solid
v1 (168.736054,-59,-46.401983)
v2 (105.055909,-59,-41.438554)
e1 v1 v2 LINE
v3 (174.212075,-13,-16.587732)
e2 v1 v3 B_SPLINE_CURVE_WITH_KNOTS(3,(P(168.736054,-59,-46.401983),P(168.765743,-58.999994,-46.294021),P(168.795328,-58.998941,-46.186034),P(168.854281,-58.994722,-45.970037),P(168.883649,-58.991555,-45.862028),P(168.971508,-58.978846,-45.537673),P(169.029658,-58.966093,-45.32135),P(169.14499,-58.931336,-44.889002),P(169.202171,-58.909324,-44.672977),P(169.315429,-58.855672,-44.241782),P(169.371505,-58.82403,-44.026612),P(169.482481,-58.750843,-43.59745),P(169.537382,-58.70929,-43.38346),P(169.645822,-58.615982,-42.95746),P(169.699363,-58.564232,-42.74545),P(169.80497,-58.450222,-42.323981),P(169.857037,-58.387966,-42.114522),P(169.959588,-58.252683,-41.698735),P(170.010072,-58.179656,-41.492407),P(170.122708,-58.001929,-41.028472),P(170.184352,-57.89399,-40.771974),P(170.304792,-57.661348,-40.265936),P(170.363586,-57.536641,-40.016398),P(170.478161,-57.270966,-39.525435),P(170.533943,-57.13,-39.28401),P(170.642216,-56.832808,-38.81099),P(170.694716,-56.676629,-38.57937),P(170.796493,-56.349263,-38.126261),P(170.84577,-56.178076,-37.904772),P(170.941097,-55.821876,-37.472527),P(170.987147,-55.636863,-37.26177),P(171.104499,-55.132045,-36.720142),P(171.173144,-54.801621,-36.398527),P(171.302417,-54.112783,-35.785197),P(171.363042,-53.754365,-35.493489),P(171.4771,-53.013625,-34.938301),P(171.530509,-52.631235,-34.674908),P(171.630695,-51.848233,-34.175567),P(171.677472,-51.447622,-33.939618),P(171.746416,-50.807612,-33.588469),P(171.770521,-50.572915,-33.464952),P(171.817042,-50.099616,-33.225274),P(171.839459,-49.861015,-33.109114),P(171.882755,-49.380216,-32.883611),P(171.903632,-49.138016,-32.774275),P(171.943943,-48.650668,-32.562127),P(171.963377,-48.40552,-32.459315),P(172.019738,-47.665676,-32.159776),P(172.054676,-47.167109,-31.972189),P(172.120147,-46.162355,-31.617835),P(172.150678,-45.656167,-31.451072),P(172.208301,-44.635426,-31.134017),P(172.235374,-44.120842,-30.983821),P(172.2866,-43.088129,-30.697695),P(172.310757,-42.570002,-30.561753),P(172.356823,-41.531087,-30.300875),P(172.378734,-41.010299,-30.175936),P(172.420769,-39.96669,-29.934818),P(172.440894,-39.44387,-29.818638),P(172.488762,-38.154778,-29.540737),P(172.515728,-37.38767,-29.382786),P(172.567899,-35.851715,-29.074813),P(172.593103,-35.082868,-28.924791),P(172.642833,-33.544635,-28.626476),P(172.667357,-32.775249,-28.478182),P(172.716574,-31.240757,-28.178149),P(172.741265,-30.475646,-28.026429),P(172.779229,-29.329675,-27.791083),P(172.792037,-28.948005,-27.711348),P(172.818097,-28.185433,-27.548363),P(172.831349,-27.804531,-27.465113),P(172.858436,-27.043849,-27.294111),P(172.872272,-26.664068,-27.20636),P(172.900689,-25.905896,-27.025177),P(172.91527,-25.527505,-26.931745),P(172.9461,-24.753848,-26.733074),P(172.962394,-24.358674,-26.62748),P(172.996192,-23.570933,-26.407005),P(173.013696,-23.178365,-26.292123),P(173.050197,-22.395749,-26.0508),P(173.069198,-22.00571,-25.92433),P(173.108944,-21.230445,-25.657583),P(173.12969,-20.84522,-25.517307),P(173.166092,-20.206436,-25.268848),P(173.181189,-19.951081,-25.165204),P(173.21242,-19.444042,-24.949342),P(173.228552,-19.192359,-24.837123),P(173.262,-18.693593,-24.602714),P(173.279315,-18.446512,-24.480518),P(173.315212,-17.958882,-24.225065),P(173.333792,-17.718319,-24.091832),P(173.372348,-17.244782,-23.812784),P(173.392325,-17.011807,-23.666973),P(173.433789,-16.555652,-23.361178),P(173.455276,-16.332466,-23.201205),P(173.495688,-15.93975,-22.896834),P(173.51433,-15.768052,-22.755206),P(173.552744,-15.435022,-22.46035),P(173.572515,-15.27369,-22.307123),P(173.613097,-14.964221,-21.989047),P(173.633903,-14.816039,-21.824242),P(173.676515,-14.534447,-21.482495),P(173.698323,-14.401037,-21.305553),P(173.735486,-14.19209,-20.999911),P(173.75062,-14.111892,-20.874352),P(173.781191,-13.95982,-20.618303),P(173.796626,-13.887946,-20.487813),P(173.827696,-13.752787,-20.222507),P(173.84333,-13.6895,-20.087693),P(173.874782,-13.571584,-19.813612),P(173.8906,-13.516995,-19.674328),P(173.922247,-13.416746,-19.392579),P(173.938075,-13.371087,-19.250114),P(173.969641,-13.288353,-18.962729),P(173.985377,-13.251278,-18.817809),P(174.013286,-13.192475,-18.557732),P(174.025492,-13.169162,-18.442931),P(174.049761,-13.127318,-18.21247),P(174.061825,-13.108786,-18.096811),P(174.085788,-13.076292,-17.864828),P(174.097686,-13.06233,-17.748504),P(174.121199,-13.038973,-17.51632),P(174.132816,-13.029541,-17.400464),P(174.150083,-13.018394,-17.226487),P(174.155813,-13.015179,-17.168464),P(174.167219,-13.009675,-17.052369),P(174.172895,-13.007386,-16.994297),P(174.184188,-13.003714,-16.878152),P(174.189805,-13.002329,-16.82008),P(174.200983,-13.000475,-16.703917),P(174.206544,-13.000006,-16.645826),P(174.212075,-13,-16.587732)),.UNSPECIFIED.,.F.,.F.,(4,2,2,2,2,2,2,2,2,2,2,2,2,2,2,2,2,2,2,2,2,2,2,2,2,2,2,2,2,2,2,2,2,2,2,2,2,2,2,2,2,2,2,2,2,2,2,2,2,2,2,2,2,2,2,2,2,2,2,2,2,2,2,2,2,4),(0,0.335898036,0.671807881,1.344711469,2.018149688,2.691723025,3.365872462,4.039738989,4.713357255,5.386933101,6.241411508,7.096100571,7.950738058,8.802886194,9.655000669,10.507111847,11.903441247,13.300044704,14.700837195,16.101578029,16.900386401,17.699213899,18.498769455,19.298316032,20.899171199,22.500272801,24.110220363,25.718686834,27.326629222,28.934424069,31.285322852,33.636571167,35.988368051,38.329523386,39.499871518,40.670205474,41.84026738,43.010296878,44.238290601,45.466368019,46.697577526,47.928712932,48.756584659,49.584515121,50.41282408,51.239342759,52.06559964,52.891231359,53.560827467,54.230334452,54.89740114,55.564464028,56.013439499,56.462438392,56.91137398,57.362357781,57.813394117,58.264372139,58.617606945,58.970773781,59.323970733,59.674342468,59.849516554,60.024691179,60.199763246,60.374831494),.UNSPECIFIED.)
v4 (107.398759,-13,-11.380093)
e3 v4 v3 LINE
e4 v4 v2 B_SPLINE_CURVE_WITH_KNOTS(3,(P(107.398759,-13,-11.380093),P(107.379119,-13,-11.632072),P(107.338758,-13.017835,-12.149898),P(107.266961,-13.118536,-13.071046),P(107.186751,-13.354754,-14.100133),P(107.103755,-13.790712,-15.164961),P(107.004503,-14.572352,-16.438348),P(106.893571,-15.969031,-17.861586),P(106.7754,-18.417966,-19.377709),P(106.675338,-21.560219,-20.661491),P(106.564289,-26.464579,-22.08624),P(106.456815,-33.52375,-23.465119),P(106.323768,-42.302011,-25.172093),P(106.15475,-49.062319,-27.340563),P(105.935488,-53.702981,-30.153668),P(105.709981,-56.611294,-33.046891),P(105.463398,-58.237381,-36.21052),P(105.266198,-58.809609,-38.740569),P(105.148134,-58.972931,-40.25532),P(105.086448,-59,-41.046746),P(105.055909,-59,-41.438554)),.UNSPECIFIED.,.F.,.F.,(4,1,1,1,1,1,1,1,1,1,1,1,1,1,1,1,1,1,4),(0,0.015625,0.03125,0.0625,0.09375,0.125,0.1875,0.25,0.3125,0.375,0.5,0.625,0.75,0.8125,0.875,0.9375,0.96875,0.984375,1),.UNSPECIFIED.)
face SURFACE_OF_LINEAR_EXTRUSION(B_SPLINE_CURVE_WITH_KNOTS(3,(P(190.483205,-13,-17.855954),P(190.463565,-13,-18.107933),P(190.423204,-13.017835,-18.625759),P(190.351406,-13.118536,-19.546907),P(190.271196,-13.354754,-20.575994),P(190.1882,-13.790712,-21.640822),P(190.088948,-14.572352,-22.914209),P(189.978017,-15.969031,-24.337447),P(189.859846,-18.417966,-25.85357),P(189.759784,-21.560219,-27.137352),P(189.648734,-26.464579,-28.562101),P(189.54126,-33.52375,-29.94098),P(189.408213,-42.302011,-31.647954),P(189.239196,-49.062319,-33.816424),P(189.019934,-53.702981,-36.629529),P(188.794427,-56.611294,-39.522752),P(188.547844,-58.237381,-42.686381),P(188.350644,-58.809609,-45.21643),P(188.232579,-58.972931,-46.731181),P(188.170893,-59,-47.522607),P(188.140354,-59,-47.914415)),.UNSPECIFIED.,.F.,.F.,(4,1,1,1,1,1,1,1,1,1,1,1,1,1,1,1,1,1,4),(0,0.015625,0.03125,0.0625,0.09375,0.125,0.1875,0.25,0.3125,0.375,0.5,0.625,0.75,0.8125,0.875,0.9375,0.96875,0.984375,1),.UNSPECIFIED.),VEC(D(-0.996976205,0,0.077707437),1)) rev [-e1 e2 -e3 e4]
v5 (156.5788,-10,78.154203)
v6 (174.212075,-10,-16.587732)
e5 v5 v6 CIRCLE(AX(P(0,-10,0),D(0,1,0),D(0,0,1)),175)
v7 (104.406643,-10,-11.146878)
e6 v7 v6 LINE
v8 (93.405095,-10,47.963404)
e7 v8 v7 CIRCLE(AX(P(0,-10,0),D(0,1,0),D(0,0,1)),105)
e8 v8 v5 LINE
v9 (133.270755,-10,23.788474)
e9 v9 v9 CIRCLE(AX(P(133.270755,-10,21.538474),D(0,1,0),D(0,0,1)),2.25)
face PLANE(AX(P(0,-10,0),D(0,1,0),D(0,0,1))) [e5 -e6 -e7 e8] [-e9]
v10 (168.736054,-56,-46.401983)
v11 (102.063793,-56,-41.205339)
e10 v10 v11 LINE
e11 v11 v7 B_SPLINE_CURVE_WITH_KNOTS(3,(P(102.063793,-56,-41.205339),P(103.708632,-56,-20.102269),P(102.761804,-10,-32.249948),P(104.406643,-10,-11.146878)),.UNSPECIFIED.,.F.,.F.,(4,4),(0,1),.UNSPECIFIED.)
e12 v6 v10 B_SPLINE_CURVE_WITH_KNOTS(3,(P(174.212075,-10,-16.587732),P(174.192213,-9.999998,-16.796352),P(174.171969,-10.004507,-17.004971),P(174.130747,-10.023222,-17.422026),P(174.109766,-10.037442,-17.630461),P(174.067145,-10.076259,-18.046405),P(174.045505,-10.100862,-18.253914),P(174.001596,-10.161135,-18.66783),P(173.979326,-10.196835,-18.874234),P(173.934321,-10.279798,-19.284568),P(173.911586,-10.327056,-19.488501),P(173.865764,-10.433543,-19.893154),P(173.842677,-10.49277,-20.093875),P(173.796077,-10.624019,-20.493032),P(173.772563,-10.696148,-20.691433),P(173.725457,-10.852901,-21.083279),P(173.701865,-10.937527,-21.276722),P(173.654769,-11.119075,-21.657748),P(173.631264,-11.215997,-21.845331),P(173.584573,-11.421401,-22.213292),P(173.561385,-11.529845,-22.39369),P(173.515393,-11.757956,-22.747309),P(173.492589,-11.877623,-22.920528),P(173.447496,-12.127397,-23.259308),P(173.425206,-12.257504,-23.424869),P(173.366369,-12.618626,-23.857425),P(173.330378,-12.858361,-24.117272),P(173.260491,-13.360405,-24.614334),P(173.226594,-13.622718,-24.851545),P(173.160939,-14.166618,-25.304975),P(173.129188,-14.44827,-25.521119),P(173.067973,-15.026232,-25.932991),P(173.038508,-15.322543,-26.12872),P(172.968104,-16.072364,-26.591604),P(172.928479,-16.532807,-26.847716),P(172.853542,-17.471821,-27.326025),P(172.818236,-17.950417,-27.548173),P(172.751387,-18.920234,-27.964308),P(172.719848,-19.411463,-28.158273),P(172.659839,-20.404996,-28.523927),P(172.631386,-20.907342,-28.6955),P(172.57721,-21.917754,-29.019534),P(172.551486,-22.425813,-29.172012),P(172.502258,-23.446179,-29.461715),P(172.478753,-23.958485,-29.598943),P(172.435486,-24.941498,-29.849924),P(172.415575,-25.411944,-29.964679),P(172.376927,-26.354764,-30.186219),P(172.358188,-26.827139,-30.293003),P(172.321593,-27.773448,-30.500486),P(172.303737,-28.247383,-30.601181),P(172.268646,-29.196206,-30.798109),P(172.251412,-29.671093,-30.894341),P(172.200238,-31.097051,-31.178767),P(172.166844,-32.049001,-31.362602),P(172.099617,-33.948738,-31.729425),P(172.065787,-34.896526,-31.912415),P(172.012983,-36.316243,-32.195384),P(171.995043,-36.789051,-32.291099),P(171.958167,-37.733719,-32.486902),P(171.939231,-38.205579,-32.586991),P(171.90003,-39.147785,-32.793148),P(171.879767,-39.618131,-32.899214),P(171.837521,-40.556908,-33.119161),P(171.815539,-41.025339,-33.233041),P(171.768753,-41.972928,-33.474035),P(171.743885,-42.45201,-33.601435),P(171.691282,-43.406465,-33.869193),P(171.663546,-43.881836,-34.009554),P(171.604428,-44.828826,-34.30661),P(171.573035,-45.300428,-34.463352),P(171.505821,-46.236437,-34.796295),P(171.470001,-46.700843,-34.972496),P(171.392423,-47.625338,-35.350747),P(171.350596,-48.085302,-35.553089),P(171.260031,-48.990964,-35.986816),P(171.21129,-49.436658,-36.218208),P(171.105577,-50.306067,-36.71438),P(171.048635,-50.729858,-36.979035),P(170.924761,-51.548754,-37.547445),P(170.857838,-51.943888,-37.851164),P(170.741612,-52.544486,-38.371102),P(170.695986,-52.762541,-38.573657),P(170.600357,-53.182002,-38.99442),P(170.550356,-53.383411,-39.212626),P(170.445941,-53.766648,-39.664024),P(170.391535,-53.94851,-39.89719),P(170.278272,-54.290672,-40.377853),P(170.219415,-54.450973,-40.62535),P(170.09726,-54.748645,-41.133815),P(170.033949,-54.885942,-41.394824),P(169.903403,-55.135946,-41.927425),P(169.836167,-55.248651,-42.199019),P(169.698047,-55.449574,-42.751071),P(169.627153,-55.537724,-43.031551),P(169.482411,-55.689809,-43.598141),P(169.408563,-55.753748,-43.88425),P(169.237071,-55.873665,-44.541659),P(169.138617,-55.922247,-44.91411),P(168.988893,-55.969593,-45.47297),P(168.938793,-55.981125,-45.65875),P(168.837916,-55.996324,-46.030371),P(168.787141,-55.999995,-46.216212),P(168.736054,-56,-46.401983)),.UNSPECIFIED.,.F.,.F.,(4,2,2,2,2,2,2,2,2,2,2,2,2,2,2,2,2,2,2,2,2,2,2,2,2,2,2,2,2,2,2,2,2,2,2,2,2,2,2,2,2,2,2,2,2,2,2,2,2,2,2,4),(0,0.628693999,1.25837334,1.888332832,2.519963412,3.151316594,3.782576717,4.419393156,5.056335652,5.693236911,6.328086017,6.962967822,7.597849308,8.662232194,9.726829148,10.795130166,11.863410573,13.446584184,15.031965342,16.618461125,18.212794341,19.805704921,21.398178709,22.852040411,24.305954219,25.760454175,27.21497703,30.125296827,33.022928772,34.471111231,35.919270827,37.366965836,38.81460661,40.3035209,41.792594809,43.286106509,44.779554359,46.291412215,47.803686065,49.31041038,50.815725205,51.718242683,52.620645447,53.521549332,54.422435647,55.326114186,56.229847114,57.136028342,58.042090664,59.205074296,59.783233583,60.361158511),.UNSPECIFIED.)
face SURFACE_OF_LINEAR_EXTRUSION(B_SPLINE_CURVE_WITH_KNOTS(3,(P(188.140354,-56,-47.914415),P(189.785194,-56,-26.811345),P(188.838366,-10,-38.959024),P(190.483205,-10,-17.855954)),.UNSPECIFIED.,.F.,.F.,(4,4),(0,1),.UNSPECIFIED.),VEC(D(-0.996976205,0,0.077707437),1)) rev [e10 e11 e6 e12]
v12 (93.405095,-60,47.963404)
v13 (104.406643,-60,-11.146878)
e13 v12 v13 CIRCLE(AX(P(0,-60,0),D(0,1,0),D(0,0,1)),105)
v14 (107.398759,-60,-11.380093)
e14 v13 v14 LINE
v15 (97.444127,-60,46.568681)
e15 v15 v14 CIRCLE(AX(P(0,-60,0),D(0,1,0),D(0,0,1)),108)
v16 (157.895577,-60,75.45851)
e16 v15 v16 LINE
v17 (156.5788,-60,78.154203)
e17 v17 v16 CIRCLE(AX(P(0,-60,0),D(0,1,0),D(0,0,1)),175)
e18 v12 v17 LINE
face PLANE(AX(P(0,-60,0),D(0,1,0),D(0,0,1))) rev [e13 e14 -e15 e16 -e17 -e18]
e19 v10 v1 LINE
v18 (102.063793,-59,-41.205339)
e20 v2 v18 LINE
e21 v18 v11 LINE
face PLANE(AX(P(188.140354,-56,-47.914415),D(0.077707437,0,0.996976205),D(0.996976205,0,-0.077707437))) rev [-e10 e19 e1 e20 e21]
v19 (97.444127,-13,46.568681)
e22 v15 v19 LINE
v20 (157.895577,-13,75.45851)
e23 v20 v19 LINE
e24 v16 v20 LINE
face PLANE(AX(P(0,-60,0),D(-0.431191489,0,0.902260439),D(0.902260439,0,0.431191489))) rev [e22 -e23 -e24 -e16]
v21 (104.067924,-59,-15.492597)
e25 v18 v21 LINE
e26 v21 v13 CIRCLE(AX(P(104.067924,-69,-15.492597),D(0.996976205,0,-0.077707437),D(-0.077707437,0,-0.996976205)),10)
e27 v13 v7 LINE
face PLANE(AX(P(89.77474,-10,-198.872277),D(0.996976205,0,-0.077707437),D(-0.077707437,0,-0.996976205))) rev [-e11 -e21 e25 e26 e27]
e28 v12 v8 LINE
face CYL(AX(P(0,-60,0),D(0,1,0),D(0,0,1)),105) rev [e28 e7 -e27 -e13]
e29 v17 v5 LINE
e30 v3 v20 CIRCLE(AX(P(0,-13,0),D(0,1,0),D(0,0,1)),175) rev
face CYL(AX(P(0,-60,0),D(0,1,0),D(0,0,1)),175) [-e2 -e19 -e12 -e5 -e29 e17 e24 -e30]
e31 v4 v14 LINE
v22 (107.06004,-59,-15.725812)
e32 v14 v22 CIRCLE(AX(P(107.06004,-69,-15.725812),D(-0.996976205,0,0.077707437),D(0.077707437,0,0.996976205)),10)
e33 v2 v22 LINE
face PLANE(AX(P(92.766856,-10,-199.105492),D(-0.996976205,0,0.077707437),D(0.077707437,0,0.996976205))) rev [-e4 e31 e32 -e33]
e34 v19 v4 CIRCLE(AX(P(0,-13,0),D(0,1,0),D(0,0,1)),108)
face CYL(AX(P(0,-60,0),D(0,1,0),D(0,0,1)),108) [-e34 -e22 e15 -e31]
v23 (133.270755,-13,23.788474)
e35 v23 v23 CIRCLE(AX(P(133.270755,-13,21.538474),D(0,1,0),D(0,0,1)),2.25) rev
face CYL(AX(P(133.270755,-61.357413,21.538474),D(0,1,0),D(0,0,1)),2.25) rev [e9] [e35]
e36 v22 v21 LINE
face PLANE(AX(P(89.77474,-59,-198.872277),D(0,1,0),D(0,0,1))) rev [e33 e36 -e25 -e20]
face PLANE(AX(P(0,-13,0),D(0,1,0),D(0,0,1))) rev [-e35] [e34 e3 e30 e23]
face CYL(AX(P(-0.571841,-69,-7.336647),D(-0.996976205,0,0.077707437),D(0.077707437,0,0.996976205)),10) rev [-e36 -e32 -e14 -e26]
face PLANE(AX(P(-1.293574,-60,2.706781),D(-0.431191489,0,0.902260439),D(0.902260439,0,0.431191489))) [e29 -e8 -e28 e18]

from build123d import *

# Parameters (mm, degrees)
SKETCH2_R                 = 178
SKETCH2_R_2               = 100
BOSS_EXTRUDE1_DEPTH       = 3
SKETCH3_R                 = 178
SKETCH3_R_2               = 175
BOSS_EXTRUDE2_DEPTH       = 60
CUT_EXTRUDE2_START        = -25
CUT_EXTRUDE2_DEPTH        = 25
BOSS_EXTRUDE4_START       = -50
BOSS_EXTRUDE4_DEPTH       = 50
BOSS_EXTRUDE5_START       = 3
BOSS_EXTRUDE5_DEPTH       = 3
BOSS_EXTRUDE15_REACH      = 346.25
BOSS_EXTRUDE15_END_RADIUS = 175
BOSS_EXTRUDE16_REACH      = 263.713
SKETCH15_W                = 3.001191186
SKETCH15_H                = 49
FILLET2_START             = 104.957134107
FILLET2_DEPTH             = 3.001191186
SKETCH16_R                = 178
CUT_EXTRUDE3_DEPTH        = 73
CUT_EXTRUDE4_REACH        = 200.073
SKETCH17_R                = 2.25


with BuildPart() as part:
    # Sketch2 → Boss-Extrude1 (new body)
    with BuildSketch(Plane(origin=(0, 0, 0), x_dir=(1, 0, 0), z_dir=(0, 1, 0))):
        with Locations(Location((0, 0, 0), (0, 0, 270))):
            Circle(SKETCH2_R)
        with Locations(Location((0, 0, 0), (0, 0, 270))):
            Circle(SKETCH2_R_2, mode=Mode.SUBTRACT)
    extrude(amount=BOSS_EXTRUDE1_DEPTH)

    # Sketch3 → Boss-Extrude2 (add)
    with BuildSketch(Plane(origin=(0, 3, 0), x_dir=(1, 0, 0), z_dir=(0, 1, 0))):
        with Locations(Location((0, 0, 0), (0, 0, 270))):
            Circle(SKETCH3_R)
        with Locations(Location((0, 0, 0), (0, 0, 270))):
            Circle(SKETCH3_R_2, mode=Mode.SUBTRACT)
    extrude(amount=BOSS_EXTRUDE2_DEPTH)

    # Sketch5 → Cut-Extrude2 (cut)
    with BuildSketch(Plane(origin=(0, 3, 0), x_dir=(1, 0, 0), z_dir=(0, 1, 0)).offset(CUT_EXTRUDE2_START)):
        with BuildLine():
            Line((174.470835958, 13.59880142), (99.697620548, 7.770743669))
            ThreePointArc((99.697620548, 7.770743669), (99.924376542, 3.888312311), (100, 0))
            ThreePointArc((100, 0), (97.525905257, -22.106510438), (90.226043925, -43.11914885))
            Line((90.226043925, -43.11914885), (157.895576869, -75.458510488))
            ThreePointArc((157.895576869, -75.458510488), (170.6703342, -38.686393266), (175, 0))
            ThreePointArc((175, 0), (174.867658949, 6.804546543), (174.470835958, 13.59880142))
        make_face()
    extrude(amount=CUT_EXTRUDE2_DEPTH, mode=Mode.SUBTRACT)

    # Sketch16 → Cut-Extrude3 (cut)
    with BuildSketch(Plane(origin=(0, -10, 0), x_dir=(1, 0, 0), z_dir=(0, 1, 0))):
        Circle(SKETCH16_R)
    extrude(amount=CUT_EXTRUDE3_DEPTH, mode=Mode.SUBTRACT)


with BuildPart() as body_2:
    # Sketch8 → Boss-Extrude4 (new body)
    with BuildSketch(Plane(origin=(0, -10, 0), x_dir=(1, 0, 0), z_dir=(0, 1, 0)).offset(BOSS_EXTRUDE4_START)):
        with BuildLine():
            Line((157.895576869, -75.458510488), (97.444127439, -46.568680758))
            ThreePointArc((97.444127439, -46.568680758), (98.081576263, -45.210666859), (98.700100465, -43.843929662))
            ThreePointArc((98.700100465, -43.843929662), (106.176660799, -19.761495426), (107.86500381, 5.398236111))
            ThreePointArc((107.86500381, 5.398236111), (107.779614919, 6.895984919), (107.673430191, 8.392403162))
            ThreePointArc((107.673430191, 8.392403162), (107.546470116, 9.88720211), (107.39875919, 11.380093344))
            Line((107.39875919, 11.380093344), (104.40664299, 11.14687847))
            ThreePointArc((104.40664299, 11.14687847), (103.227309111, -19.212564998), (93.405095457, -47.963404203))
            Line((93.405095457, -47.963404203), (156.578799716, -78.15420321))
            ThreePointArc((156.578799716, -78.15420321), (157.242965096, -76.80917867), (157.895576869, -75.458510488))
        make_face()
    extrude(amount=BOSS_EXTRUDE4_DEPTH)

    # Sketch9 → Boss-Extrude5 (add)
    with BuildSketch(Plane(origin=(0, -10, 0), x_dir=(-1, 0, 0), z_dir=(0, -1, 0)).offset(BOSS_EXTRUDE5_START)):
        with BuildLine():
            ThreePointArc((-93.405095457, -47.963404203), (-103.227309111, -19.212564998), (-104.40664299, 11.14687847))
            Line((-104.40664299, 11.14687847), (-174.212075233, 16.587731699))
            ThreePointArc((-174.212075233, 16.587731699), (-172.045515184, -32.020941663), (-156.578799716, -78.15420321))
            Line((-156.578799716, -78.15420321), (-93.405095457, -47.963404203))
        make_face()
    extrude(amount=-BOSS_EXTRUDE5_DEPTH)


with BuildPart() as body_3:
    # Boss-Extrude15: up to this cylinder (the profile starts inside it)
    boss_extrude15_end = Plane(origin=(0, -35.052685, 0), z_dir=(0, -1, 0)) * Cylinder(BOSS_EXTRUDE15_END_RADIUS, 1043.5, mode=Mode.PRIVATE)
    # Sketch14 → Boss-Extrude15 (new, up to the surface)
    with BuildSketch(Plane(origin=(104.6397653, 0, -8.155949853), x_dir=(0, 1, 0), z_dir=(0.9969762054751131, 0, -0.07770743668687732)), mode=Mode.PRIVATE) as boss_extrude15_sk1:
        with BuildLine():
            Line((-56, -33.149626863), (-59, -33.149626863))
            add(Edge.make_bspline(
                [(-13, -3), (-13, -3.252742632), (-13.017835017, -3.772139773), (-13.118535688, -4.696081698), (-13.354753506, -5.728289796), (-13.790711815, -6.796346653), (-14.57235228, -8.073596542), (-15.969031451, -9.501150583), (-18.417965946, -11.02187183), (-21.560218655, -12.309547439), (-26.464579206, -13.73861764), (-33.523749843, -15.121678766), (-42.302010507, -16.833830818), (-49.062318848, -19.008877457), (-53.702980916, -21.83051429), (-56.611293913, -24.732512094), (-58.237380526, -27.905736518), (-58.80960896, -30.443459169), (-58.972930909, -31.962804263), (-59, -32.756631085), (-59, -33.149626863)],
                knots=[0, 0, 0, 0, 0.015625, 0.03125, 0.0625, 0.09375, 0.125, 0.1875, 0.25, 0.3125, 0.375, 0.5, 0.625, 0.75, 0.8125, 0.875, 0.9375, 0.96875, 0.984375, 1, 1, 1, 1], degree=3))
            Line((-13, -3), (-10, -3))
            add(Edge.make_bspline(
                [(-10, -3), (-10, -24.167074489), (-56, -11.982552374), (-56, -33.149626863)],
                knots=[0, 0, 0, 0, 1, 1, 1, 1], degree=3))
        make_face()
    boss_extrude15_tool1 = extrude(boss_extrude15_sk1.sketch, amount=BOSS_EXTRUDE15_REACH, mode=Mode.PRIVATE) & boss_extrude15_end
    add(boss_extrude15_tool1.solids().sort_by_distance((103.281222, -35.052685, -25.585884))[0])

    # Sketch15 → Boss-Extrude16 (add, up to next)
    with BuildSketch(Plane(origin=(-0.23312231, 0, -2.990928616), x_dir=(-0.9969762054751131, 0, 0.07770743668687734), z_dir=(-0.07770743668687734, 0, -0.9969762054751131)), mode=Mode.PRIVATE) as boss_extrude16_sk1:
        with Locations((-106.4577297, -34.5)):
            Rectangle(SKETCH15_W, SKETCH15_H)
    boss_extrude16_tool1 = extrude(boss_extrude16_sk1.sketch, amount=BOSS_EXTRUDE16_REACH, mode=Mode.PRIVATE) - body_3.part

    add(body_2.part)  # Boss-Extrude16 merges body 2
    add(boss_extrude16_tool1.solids().sort_by_distance((105.902701, -34.5, -11.263486))[0])

    # Fillet2: read off the stored shape, not the designer's step
    # Fillet2 outline → Fillet2 (add)
    with BuildSketch(Plane(origin=(0, 0, 0), x_dir=(0, 1, 0), z_dir=(0.9969762054751131, 0, -0.07770743668687731)).offset(FILLET2_START)):
        with BuildLine():
            Line((-59, -3), (-60, -3))
            ThreePointArc((-60, -3), (-59.253205655, -5.122830966), (-59, -7.358898944))
            Line((-59, -7.358898944), (-59, -3))
        make_face()
    extrude(amount=FILLET2_DEPTH)

    # Sketch17 → Cut-Extrude4 (cut, up to next)
    with BuildSketch(Plane(origin=(0, -10, 0), x_dir=(1, 0, 0), z_dir=(0, 1, 0)), mode=Mode.PRIVATE) as cut_extrude4_sk1:
        with Locations(Location((133.270755038, -21.538473754, 0), (0, 0, 270))):
            Circle(SKETCH17_R)
    cut_extrude4_tool1 = extrude(cut_extrude4_sk1.sketch, amount=-CUT_EXTRUDE4_REACH, mode=Mode.PRIVATE) & body_3.part
    add(cut_extrude4_tool1.solids().sort_by_distance((133.270755, -10, 21.538474))[0], mode=Mode.SUBTRACT)


solid = body_3.part
